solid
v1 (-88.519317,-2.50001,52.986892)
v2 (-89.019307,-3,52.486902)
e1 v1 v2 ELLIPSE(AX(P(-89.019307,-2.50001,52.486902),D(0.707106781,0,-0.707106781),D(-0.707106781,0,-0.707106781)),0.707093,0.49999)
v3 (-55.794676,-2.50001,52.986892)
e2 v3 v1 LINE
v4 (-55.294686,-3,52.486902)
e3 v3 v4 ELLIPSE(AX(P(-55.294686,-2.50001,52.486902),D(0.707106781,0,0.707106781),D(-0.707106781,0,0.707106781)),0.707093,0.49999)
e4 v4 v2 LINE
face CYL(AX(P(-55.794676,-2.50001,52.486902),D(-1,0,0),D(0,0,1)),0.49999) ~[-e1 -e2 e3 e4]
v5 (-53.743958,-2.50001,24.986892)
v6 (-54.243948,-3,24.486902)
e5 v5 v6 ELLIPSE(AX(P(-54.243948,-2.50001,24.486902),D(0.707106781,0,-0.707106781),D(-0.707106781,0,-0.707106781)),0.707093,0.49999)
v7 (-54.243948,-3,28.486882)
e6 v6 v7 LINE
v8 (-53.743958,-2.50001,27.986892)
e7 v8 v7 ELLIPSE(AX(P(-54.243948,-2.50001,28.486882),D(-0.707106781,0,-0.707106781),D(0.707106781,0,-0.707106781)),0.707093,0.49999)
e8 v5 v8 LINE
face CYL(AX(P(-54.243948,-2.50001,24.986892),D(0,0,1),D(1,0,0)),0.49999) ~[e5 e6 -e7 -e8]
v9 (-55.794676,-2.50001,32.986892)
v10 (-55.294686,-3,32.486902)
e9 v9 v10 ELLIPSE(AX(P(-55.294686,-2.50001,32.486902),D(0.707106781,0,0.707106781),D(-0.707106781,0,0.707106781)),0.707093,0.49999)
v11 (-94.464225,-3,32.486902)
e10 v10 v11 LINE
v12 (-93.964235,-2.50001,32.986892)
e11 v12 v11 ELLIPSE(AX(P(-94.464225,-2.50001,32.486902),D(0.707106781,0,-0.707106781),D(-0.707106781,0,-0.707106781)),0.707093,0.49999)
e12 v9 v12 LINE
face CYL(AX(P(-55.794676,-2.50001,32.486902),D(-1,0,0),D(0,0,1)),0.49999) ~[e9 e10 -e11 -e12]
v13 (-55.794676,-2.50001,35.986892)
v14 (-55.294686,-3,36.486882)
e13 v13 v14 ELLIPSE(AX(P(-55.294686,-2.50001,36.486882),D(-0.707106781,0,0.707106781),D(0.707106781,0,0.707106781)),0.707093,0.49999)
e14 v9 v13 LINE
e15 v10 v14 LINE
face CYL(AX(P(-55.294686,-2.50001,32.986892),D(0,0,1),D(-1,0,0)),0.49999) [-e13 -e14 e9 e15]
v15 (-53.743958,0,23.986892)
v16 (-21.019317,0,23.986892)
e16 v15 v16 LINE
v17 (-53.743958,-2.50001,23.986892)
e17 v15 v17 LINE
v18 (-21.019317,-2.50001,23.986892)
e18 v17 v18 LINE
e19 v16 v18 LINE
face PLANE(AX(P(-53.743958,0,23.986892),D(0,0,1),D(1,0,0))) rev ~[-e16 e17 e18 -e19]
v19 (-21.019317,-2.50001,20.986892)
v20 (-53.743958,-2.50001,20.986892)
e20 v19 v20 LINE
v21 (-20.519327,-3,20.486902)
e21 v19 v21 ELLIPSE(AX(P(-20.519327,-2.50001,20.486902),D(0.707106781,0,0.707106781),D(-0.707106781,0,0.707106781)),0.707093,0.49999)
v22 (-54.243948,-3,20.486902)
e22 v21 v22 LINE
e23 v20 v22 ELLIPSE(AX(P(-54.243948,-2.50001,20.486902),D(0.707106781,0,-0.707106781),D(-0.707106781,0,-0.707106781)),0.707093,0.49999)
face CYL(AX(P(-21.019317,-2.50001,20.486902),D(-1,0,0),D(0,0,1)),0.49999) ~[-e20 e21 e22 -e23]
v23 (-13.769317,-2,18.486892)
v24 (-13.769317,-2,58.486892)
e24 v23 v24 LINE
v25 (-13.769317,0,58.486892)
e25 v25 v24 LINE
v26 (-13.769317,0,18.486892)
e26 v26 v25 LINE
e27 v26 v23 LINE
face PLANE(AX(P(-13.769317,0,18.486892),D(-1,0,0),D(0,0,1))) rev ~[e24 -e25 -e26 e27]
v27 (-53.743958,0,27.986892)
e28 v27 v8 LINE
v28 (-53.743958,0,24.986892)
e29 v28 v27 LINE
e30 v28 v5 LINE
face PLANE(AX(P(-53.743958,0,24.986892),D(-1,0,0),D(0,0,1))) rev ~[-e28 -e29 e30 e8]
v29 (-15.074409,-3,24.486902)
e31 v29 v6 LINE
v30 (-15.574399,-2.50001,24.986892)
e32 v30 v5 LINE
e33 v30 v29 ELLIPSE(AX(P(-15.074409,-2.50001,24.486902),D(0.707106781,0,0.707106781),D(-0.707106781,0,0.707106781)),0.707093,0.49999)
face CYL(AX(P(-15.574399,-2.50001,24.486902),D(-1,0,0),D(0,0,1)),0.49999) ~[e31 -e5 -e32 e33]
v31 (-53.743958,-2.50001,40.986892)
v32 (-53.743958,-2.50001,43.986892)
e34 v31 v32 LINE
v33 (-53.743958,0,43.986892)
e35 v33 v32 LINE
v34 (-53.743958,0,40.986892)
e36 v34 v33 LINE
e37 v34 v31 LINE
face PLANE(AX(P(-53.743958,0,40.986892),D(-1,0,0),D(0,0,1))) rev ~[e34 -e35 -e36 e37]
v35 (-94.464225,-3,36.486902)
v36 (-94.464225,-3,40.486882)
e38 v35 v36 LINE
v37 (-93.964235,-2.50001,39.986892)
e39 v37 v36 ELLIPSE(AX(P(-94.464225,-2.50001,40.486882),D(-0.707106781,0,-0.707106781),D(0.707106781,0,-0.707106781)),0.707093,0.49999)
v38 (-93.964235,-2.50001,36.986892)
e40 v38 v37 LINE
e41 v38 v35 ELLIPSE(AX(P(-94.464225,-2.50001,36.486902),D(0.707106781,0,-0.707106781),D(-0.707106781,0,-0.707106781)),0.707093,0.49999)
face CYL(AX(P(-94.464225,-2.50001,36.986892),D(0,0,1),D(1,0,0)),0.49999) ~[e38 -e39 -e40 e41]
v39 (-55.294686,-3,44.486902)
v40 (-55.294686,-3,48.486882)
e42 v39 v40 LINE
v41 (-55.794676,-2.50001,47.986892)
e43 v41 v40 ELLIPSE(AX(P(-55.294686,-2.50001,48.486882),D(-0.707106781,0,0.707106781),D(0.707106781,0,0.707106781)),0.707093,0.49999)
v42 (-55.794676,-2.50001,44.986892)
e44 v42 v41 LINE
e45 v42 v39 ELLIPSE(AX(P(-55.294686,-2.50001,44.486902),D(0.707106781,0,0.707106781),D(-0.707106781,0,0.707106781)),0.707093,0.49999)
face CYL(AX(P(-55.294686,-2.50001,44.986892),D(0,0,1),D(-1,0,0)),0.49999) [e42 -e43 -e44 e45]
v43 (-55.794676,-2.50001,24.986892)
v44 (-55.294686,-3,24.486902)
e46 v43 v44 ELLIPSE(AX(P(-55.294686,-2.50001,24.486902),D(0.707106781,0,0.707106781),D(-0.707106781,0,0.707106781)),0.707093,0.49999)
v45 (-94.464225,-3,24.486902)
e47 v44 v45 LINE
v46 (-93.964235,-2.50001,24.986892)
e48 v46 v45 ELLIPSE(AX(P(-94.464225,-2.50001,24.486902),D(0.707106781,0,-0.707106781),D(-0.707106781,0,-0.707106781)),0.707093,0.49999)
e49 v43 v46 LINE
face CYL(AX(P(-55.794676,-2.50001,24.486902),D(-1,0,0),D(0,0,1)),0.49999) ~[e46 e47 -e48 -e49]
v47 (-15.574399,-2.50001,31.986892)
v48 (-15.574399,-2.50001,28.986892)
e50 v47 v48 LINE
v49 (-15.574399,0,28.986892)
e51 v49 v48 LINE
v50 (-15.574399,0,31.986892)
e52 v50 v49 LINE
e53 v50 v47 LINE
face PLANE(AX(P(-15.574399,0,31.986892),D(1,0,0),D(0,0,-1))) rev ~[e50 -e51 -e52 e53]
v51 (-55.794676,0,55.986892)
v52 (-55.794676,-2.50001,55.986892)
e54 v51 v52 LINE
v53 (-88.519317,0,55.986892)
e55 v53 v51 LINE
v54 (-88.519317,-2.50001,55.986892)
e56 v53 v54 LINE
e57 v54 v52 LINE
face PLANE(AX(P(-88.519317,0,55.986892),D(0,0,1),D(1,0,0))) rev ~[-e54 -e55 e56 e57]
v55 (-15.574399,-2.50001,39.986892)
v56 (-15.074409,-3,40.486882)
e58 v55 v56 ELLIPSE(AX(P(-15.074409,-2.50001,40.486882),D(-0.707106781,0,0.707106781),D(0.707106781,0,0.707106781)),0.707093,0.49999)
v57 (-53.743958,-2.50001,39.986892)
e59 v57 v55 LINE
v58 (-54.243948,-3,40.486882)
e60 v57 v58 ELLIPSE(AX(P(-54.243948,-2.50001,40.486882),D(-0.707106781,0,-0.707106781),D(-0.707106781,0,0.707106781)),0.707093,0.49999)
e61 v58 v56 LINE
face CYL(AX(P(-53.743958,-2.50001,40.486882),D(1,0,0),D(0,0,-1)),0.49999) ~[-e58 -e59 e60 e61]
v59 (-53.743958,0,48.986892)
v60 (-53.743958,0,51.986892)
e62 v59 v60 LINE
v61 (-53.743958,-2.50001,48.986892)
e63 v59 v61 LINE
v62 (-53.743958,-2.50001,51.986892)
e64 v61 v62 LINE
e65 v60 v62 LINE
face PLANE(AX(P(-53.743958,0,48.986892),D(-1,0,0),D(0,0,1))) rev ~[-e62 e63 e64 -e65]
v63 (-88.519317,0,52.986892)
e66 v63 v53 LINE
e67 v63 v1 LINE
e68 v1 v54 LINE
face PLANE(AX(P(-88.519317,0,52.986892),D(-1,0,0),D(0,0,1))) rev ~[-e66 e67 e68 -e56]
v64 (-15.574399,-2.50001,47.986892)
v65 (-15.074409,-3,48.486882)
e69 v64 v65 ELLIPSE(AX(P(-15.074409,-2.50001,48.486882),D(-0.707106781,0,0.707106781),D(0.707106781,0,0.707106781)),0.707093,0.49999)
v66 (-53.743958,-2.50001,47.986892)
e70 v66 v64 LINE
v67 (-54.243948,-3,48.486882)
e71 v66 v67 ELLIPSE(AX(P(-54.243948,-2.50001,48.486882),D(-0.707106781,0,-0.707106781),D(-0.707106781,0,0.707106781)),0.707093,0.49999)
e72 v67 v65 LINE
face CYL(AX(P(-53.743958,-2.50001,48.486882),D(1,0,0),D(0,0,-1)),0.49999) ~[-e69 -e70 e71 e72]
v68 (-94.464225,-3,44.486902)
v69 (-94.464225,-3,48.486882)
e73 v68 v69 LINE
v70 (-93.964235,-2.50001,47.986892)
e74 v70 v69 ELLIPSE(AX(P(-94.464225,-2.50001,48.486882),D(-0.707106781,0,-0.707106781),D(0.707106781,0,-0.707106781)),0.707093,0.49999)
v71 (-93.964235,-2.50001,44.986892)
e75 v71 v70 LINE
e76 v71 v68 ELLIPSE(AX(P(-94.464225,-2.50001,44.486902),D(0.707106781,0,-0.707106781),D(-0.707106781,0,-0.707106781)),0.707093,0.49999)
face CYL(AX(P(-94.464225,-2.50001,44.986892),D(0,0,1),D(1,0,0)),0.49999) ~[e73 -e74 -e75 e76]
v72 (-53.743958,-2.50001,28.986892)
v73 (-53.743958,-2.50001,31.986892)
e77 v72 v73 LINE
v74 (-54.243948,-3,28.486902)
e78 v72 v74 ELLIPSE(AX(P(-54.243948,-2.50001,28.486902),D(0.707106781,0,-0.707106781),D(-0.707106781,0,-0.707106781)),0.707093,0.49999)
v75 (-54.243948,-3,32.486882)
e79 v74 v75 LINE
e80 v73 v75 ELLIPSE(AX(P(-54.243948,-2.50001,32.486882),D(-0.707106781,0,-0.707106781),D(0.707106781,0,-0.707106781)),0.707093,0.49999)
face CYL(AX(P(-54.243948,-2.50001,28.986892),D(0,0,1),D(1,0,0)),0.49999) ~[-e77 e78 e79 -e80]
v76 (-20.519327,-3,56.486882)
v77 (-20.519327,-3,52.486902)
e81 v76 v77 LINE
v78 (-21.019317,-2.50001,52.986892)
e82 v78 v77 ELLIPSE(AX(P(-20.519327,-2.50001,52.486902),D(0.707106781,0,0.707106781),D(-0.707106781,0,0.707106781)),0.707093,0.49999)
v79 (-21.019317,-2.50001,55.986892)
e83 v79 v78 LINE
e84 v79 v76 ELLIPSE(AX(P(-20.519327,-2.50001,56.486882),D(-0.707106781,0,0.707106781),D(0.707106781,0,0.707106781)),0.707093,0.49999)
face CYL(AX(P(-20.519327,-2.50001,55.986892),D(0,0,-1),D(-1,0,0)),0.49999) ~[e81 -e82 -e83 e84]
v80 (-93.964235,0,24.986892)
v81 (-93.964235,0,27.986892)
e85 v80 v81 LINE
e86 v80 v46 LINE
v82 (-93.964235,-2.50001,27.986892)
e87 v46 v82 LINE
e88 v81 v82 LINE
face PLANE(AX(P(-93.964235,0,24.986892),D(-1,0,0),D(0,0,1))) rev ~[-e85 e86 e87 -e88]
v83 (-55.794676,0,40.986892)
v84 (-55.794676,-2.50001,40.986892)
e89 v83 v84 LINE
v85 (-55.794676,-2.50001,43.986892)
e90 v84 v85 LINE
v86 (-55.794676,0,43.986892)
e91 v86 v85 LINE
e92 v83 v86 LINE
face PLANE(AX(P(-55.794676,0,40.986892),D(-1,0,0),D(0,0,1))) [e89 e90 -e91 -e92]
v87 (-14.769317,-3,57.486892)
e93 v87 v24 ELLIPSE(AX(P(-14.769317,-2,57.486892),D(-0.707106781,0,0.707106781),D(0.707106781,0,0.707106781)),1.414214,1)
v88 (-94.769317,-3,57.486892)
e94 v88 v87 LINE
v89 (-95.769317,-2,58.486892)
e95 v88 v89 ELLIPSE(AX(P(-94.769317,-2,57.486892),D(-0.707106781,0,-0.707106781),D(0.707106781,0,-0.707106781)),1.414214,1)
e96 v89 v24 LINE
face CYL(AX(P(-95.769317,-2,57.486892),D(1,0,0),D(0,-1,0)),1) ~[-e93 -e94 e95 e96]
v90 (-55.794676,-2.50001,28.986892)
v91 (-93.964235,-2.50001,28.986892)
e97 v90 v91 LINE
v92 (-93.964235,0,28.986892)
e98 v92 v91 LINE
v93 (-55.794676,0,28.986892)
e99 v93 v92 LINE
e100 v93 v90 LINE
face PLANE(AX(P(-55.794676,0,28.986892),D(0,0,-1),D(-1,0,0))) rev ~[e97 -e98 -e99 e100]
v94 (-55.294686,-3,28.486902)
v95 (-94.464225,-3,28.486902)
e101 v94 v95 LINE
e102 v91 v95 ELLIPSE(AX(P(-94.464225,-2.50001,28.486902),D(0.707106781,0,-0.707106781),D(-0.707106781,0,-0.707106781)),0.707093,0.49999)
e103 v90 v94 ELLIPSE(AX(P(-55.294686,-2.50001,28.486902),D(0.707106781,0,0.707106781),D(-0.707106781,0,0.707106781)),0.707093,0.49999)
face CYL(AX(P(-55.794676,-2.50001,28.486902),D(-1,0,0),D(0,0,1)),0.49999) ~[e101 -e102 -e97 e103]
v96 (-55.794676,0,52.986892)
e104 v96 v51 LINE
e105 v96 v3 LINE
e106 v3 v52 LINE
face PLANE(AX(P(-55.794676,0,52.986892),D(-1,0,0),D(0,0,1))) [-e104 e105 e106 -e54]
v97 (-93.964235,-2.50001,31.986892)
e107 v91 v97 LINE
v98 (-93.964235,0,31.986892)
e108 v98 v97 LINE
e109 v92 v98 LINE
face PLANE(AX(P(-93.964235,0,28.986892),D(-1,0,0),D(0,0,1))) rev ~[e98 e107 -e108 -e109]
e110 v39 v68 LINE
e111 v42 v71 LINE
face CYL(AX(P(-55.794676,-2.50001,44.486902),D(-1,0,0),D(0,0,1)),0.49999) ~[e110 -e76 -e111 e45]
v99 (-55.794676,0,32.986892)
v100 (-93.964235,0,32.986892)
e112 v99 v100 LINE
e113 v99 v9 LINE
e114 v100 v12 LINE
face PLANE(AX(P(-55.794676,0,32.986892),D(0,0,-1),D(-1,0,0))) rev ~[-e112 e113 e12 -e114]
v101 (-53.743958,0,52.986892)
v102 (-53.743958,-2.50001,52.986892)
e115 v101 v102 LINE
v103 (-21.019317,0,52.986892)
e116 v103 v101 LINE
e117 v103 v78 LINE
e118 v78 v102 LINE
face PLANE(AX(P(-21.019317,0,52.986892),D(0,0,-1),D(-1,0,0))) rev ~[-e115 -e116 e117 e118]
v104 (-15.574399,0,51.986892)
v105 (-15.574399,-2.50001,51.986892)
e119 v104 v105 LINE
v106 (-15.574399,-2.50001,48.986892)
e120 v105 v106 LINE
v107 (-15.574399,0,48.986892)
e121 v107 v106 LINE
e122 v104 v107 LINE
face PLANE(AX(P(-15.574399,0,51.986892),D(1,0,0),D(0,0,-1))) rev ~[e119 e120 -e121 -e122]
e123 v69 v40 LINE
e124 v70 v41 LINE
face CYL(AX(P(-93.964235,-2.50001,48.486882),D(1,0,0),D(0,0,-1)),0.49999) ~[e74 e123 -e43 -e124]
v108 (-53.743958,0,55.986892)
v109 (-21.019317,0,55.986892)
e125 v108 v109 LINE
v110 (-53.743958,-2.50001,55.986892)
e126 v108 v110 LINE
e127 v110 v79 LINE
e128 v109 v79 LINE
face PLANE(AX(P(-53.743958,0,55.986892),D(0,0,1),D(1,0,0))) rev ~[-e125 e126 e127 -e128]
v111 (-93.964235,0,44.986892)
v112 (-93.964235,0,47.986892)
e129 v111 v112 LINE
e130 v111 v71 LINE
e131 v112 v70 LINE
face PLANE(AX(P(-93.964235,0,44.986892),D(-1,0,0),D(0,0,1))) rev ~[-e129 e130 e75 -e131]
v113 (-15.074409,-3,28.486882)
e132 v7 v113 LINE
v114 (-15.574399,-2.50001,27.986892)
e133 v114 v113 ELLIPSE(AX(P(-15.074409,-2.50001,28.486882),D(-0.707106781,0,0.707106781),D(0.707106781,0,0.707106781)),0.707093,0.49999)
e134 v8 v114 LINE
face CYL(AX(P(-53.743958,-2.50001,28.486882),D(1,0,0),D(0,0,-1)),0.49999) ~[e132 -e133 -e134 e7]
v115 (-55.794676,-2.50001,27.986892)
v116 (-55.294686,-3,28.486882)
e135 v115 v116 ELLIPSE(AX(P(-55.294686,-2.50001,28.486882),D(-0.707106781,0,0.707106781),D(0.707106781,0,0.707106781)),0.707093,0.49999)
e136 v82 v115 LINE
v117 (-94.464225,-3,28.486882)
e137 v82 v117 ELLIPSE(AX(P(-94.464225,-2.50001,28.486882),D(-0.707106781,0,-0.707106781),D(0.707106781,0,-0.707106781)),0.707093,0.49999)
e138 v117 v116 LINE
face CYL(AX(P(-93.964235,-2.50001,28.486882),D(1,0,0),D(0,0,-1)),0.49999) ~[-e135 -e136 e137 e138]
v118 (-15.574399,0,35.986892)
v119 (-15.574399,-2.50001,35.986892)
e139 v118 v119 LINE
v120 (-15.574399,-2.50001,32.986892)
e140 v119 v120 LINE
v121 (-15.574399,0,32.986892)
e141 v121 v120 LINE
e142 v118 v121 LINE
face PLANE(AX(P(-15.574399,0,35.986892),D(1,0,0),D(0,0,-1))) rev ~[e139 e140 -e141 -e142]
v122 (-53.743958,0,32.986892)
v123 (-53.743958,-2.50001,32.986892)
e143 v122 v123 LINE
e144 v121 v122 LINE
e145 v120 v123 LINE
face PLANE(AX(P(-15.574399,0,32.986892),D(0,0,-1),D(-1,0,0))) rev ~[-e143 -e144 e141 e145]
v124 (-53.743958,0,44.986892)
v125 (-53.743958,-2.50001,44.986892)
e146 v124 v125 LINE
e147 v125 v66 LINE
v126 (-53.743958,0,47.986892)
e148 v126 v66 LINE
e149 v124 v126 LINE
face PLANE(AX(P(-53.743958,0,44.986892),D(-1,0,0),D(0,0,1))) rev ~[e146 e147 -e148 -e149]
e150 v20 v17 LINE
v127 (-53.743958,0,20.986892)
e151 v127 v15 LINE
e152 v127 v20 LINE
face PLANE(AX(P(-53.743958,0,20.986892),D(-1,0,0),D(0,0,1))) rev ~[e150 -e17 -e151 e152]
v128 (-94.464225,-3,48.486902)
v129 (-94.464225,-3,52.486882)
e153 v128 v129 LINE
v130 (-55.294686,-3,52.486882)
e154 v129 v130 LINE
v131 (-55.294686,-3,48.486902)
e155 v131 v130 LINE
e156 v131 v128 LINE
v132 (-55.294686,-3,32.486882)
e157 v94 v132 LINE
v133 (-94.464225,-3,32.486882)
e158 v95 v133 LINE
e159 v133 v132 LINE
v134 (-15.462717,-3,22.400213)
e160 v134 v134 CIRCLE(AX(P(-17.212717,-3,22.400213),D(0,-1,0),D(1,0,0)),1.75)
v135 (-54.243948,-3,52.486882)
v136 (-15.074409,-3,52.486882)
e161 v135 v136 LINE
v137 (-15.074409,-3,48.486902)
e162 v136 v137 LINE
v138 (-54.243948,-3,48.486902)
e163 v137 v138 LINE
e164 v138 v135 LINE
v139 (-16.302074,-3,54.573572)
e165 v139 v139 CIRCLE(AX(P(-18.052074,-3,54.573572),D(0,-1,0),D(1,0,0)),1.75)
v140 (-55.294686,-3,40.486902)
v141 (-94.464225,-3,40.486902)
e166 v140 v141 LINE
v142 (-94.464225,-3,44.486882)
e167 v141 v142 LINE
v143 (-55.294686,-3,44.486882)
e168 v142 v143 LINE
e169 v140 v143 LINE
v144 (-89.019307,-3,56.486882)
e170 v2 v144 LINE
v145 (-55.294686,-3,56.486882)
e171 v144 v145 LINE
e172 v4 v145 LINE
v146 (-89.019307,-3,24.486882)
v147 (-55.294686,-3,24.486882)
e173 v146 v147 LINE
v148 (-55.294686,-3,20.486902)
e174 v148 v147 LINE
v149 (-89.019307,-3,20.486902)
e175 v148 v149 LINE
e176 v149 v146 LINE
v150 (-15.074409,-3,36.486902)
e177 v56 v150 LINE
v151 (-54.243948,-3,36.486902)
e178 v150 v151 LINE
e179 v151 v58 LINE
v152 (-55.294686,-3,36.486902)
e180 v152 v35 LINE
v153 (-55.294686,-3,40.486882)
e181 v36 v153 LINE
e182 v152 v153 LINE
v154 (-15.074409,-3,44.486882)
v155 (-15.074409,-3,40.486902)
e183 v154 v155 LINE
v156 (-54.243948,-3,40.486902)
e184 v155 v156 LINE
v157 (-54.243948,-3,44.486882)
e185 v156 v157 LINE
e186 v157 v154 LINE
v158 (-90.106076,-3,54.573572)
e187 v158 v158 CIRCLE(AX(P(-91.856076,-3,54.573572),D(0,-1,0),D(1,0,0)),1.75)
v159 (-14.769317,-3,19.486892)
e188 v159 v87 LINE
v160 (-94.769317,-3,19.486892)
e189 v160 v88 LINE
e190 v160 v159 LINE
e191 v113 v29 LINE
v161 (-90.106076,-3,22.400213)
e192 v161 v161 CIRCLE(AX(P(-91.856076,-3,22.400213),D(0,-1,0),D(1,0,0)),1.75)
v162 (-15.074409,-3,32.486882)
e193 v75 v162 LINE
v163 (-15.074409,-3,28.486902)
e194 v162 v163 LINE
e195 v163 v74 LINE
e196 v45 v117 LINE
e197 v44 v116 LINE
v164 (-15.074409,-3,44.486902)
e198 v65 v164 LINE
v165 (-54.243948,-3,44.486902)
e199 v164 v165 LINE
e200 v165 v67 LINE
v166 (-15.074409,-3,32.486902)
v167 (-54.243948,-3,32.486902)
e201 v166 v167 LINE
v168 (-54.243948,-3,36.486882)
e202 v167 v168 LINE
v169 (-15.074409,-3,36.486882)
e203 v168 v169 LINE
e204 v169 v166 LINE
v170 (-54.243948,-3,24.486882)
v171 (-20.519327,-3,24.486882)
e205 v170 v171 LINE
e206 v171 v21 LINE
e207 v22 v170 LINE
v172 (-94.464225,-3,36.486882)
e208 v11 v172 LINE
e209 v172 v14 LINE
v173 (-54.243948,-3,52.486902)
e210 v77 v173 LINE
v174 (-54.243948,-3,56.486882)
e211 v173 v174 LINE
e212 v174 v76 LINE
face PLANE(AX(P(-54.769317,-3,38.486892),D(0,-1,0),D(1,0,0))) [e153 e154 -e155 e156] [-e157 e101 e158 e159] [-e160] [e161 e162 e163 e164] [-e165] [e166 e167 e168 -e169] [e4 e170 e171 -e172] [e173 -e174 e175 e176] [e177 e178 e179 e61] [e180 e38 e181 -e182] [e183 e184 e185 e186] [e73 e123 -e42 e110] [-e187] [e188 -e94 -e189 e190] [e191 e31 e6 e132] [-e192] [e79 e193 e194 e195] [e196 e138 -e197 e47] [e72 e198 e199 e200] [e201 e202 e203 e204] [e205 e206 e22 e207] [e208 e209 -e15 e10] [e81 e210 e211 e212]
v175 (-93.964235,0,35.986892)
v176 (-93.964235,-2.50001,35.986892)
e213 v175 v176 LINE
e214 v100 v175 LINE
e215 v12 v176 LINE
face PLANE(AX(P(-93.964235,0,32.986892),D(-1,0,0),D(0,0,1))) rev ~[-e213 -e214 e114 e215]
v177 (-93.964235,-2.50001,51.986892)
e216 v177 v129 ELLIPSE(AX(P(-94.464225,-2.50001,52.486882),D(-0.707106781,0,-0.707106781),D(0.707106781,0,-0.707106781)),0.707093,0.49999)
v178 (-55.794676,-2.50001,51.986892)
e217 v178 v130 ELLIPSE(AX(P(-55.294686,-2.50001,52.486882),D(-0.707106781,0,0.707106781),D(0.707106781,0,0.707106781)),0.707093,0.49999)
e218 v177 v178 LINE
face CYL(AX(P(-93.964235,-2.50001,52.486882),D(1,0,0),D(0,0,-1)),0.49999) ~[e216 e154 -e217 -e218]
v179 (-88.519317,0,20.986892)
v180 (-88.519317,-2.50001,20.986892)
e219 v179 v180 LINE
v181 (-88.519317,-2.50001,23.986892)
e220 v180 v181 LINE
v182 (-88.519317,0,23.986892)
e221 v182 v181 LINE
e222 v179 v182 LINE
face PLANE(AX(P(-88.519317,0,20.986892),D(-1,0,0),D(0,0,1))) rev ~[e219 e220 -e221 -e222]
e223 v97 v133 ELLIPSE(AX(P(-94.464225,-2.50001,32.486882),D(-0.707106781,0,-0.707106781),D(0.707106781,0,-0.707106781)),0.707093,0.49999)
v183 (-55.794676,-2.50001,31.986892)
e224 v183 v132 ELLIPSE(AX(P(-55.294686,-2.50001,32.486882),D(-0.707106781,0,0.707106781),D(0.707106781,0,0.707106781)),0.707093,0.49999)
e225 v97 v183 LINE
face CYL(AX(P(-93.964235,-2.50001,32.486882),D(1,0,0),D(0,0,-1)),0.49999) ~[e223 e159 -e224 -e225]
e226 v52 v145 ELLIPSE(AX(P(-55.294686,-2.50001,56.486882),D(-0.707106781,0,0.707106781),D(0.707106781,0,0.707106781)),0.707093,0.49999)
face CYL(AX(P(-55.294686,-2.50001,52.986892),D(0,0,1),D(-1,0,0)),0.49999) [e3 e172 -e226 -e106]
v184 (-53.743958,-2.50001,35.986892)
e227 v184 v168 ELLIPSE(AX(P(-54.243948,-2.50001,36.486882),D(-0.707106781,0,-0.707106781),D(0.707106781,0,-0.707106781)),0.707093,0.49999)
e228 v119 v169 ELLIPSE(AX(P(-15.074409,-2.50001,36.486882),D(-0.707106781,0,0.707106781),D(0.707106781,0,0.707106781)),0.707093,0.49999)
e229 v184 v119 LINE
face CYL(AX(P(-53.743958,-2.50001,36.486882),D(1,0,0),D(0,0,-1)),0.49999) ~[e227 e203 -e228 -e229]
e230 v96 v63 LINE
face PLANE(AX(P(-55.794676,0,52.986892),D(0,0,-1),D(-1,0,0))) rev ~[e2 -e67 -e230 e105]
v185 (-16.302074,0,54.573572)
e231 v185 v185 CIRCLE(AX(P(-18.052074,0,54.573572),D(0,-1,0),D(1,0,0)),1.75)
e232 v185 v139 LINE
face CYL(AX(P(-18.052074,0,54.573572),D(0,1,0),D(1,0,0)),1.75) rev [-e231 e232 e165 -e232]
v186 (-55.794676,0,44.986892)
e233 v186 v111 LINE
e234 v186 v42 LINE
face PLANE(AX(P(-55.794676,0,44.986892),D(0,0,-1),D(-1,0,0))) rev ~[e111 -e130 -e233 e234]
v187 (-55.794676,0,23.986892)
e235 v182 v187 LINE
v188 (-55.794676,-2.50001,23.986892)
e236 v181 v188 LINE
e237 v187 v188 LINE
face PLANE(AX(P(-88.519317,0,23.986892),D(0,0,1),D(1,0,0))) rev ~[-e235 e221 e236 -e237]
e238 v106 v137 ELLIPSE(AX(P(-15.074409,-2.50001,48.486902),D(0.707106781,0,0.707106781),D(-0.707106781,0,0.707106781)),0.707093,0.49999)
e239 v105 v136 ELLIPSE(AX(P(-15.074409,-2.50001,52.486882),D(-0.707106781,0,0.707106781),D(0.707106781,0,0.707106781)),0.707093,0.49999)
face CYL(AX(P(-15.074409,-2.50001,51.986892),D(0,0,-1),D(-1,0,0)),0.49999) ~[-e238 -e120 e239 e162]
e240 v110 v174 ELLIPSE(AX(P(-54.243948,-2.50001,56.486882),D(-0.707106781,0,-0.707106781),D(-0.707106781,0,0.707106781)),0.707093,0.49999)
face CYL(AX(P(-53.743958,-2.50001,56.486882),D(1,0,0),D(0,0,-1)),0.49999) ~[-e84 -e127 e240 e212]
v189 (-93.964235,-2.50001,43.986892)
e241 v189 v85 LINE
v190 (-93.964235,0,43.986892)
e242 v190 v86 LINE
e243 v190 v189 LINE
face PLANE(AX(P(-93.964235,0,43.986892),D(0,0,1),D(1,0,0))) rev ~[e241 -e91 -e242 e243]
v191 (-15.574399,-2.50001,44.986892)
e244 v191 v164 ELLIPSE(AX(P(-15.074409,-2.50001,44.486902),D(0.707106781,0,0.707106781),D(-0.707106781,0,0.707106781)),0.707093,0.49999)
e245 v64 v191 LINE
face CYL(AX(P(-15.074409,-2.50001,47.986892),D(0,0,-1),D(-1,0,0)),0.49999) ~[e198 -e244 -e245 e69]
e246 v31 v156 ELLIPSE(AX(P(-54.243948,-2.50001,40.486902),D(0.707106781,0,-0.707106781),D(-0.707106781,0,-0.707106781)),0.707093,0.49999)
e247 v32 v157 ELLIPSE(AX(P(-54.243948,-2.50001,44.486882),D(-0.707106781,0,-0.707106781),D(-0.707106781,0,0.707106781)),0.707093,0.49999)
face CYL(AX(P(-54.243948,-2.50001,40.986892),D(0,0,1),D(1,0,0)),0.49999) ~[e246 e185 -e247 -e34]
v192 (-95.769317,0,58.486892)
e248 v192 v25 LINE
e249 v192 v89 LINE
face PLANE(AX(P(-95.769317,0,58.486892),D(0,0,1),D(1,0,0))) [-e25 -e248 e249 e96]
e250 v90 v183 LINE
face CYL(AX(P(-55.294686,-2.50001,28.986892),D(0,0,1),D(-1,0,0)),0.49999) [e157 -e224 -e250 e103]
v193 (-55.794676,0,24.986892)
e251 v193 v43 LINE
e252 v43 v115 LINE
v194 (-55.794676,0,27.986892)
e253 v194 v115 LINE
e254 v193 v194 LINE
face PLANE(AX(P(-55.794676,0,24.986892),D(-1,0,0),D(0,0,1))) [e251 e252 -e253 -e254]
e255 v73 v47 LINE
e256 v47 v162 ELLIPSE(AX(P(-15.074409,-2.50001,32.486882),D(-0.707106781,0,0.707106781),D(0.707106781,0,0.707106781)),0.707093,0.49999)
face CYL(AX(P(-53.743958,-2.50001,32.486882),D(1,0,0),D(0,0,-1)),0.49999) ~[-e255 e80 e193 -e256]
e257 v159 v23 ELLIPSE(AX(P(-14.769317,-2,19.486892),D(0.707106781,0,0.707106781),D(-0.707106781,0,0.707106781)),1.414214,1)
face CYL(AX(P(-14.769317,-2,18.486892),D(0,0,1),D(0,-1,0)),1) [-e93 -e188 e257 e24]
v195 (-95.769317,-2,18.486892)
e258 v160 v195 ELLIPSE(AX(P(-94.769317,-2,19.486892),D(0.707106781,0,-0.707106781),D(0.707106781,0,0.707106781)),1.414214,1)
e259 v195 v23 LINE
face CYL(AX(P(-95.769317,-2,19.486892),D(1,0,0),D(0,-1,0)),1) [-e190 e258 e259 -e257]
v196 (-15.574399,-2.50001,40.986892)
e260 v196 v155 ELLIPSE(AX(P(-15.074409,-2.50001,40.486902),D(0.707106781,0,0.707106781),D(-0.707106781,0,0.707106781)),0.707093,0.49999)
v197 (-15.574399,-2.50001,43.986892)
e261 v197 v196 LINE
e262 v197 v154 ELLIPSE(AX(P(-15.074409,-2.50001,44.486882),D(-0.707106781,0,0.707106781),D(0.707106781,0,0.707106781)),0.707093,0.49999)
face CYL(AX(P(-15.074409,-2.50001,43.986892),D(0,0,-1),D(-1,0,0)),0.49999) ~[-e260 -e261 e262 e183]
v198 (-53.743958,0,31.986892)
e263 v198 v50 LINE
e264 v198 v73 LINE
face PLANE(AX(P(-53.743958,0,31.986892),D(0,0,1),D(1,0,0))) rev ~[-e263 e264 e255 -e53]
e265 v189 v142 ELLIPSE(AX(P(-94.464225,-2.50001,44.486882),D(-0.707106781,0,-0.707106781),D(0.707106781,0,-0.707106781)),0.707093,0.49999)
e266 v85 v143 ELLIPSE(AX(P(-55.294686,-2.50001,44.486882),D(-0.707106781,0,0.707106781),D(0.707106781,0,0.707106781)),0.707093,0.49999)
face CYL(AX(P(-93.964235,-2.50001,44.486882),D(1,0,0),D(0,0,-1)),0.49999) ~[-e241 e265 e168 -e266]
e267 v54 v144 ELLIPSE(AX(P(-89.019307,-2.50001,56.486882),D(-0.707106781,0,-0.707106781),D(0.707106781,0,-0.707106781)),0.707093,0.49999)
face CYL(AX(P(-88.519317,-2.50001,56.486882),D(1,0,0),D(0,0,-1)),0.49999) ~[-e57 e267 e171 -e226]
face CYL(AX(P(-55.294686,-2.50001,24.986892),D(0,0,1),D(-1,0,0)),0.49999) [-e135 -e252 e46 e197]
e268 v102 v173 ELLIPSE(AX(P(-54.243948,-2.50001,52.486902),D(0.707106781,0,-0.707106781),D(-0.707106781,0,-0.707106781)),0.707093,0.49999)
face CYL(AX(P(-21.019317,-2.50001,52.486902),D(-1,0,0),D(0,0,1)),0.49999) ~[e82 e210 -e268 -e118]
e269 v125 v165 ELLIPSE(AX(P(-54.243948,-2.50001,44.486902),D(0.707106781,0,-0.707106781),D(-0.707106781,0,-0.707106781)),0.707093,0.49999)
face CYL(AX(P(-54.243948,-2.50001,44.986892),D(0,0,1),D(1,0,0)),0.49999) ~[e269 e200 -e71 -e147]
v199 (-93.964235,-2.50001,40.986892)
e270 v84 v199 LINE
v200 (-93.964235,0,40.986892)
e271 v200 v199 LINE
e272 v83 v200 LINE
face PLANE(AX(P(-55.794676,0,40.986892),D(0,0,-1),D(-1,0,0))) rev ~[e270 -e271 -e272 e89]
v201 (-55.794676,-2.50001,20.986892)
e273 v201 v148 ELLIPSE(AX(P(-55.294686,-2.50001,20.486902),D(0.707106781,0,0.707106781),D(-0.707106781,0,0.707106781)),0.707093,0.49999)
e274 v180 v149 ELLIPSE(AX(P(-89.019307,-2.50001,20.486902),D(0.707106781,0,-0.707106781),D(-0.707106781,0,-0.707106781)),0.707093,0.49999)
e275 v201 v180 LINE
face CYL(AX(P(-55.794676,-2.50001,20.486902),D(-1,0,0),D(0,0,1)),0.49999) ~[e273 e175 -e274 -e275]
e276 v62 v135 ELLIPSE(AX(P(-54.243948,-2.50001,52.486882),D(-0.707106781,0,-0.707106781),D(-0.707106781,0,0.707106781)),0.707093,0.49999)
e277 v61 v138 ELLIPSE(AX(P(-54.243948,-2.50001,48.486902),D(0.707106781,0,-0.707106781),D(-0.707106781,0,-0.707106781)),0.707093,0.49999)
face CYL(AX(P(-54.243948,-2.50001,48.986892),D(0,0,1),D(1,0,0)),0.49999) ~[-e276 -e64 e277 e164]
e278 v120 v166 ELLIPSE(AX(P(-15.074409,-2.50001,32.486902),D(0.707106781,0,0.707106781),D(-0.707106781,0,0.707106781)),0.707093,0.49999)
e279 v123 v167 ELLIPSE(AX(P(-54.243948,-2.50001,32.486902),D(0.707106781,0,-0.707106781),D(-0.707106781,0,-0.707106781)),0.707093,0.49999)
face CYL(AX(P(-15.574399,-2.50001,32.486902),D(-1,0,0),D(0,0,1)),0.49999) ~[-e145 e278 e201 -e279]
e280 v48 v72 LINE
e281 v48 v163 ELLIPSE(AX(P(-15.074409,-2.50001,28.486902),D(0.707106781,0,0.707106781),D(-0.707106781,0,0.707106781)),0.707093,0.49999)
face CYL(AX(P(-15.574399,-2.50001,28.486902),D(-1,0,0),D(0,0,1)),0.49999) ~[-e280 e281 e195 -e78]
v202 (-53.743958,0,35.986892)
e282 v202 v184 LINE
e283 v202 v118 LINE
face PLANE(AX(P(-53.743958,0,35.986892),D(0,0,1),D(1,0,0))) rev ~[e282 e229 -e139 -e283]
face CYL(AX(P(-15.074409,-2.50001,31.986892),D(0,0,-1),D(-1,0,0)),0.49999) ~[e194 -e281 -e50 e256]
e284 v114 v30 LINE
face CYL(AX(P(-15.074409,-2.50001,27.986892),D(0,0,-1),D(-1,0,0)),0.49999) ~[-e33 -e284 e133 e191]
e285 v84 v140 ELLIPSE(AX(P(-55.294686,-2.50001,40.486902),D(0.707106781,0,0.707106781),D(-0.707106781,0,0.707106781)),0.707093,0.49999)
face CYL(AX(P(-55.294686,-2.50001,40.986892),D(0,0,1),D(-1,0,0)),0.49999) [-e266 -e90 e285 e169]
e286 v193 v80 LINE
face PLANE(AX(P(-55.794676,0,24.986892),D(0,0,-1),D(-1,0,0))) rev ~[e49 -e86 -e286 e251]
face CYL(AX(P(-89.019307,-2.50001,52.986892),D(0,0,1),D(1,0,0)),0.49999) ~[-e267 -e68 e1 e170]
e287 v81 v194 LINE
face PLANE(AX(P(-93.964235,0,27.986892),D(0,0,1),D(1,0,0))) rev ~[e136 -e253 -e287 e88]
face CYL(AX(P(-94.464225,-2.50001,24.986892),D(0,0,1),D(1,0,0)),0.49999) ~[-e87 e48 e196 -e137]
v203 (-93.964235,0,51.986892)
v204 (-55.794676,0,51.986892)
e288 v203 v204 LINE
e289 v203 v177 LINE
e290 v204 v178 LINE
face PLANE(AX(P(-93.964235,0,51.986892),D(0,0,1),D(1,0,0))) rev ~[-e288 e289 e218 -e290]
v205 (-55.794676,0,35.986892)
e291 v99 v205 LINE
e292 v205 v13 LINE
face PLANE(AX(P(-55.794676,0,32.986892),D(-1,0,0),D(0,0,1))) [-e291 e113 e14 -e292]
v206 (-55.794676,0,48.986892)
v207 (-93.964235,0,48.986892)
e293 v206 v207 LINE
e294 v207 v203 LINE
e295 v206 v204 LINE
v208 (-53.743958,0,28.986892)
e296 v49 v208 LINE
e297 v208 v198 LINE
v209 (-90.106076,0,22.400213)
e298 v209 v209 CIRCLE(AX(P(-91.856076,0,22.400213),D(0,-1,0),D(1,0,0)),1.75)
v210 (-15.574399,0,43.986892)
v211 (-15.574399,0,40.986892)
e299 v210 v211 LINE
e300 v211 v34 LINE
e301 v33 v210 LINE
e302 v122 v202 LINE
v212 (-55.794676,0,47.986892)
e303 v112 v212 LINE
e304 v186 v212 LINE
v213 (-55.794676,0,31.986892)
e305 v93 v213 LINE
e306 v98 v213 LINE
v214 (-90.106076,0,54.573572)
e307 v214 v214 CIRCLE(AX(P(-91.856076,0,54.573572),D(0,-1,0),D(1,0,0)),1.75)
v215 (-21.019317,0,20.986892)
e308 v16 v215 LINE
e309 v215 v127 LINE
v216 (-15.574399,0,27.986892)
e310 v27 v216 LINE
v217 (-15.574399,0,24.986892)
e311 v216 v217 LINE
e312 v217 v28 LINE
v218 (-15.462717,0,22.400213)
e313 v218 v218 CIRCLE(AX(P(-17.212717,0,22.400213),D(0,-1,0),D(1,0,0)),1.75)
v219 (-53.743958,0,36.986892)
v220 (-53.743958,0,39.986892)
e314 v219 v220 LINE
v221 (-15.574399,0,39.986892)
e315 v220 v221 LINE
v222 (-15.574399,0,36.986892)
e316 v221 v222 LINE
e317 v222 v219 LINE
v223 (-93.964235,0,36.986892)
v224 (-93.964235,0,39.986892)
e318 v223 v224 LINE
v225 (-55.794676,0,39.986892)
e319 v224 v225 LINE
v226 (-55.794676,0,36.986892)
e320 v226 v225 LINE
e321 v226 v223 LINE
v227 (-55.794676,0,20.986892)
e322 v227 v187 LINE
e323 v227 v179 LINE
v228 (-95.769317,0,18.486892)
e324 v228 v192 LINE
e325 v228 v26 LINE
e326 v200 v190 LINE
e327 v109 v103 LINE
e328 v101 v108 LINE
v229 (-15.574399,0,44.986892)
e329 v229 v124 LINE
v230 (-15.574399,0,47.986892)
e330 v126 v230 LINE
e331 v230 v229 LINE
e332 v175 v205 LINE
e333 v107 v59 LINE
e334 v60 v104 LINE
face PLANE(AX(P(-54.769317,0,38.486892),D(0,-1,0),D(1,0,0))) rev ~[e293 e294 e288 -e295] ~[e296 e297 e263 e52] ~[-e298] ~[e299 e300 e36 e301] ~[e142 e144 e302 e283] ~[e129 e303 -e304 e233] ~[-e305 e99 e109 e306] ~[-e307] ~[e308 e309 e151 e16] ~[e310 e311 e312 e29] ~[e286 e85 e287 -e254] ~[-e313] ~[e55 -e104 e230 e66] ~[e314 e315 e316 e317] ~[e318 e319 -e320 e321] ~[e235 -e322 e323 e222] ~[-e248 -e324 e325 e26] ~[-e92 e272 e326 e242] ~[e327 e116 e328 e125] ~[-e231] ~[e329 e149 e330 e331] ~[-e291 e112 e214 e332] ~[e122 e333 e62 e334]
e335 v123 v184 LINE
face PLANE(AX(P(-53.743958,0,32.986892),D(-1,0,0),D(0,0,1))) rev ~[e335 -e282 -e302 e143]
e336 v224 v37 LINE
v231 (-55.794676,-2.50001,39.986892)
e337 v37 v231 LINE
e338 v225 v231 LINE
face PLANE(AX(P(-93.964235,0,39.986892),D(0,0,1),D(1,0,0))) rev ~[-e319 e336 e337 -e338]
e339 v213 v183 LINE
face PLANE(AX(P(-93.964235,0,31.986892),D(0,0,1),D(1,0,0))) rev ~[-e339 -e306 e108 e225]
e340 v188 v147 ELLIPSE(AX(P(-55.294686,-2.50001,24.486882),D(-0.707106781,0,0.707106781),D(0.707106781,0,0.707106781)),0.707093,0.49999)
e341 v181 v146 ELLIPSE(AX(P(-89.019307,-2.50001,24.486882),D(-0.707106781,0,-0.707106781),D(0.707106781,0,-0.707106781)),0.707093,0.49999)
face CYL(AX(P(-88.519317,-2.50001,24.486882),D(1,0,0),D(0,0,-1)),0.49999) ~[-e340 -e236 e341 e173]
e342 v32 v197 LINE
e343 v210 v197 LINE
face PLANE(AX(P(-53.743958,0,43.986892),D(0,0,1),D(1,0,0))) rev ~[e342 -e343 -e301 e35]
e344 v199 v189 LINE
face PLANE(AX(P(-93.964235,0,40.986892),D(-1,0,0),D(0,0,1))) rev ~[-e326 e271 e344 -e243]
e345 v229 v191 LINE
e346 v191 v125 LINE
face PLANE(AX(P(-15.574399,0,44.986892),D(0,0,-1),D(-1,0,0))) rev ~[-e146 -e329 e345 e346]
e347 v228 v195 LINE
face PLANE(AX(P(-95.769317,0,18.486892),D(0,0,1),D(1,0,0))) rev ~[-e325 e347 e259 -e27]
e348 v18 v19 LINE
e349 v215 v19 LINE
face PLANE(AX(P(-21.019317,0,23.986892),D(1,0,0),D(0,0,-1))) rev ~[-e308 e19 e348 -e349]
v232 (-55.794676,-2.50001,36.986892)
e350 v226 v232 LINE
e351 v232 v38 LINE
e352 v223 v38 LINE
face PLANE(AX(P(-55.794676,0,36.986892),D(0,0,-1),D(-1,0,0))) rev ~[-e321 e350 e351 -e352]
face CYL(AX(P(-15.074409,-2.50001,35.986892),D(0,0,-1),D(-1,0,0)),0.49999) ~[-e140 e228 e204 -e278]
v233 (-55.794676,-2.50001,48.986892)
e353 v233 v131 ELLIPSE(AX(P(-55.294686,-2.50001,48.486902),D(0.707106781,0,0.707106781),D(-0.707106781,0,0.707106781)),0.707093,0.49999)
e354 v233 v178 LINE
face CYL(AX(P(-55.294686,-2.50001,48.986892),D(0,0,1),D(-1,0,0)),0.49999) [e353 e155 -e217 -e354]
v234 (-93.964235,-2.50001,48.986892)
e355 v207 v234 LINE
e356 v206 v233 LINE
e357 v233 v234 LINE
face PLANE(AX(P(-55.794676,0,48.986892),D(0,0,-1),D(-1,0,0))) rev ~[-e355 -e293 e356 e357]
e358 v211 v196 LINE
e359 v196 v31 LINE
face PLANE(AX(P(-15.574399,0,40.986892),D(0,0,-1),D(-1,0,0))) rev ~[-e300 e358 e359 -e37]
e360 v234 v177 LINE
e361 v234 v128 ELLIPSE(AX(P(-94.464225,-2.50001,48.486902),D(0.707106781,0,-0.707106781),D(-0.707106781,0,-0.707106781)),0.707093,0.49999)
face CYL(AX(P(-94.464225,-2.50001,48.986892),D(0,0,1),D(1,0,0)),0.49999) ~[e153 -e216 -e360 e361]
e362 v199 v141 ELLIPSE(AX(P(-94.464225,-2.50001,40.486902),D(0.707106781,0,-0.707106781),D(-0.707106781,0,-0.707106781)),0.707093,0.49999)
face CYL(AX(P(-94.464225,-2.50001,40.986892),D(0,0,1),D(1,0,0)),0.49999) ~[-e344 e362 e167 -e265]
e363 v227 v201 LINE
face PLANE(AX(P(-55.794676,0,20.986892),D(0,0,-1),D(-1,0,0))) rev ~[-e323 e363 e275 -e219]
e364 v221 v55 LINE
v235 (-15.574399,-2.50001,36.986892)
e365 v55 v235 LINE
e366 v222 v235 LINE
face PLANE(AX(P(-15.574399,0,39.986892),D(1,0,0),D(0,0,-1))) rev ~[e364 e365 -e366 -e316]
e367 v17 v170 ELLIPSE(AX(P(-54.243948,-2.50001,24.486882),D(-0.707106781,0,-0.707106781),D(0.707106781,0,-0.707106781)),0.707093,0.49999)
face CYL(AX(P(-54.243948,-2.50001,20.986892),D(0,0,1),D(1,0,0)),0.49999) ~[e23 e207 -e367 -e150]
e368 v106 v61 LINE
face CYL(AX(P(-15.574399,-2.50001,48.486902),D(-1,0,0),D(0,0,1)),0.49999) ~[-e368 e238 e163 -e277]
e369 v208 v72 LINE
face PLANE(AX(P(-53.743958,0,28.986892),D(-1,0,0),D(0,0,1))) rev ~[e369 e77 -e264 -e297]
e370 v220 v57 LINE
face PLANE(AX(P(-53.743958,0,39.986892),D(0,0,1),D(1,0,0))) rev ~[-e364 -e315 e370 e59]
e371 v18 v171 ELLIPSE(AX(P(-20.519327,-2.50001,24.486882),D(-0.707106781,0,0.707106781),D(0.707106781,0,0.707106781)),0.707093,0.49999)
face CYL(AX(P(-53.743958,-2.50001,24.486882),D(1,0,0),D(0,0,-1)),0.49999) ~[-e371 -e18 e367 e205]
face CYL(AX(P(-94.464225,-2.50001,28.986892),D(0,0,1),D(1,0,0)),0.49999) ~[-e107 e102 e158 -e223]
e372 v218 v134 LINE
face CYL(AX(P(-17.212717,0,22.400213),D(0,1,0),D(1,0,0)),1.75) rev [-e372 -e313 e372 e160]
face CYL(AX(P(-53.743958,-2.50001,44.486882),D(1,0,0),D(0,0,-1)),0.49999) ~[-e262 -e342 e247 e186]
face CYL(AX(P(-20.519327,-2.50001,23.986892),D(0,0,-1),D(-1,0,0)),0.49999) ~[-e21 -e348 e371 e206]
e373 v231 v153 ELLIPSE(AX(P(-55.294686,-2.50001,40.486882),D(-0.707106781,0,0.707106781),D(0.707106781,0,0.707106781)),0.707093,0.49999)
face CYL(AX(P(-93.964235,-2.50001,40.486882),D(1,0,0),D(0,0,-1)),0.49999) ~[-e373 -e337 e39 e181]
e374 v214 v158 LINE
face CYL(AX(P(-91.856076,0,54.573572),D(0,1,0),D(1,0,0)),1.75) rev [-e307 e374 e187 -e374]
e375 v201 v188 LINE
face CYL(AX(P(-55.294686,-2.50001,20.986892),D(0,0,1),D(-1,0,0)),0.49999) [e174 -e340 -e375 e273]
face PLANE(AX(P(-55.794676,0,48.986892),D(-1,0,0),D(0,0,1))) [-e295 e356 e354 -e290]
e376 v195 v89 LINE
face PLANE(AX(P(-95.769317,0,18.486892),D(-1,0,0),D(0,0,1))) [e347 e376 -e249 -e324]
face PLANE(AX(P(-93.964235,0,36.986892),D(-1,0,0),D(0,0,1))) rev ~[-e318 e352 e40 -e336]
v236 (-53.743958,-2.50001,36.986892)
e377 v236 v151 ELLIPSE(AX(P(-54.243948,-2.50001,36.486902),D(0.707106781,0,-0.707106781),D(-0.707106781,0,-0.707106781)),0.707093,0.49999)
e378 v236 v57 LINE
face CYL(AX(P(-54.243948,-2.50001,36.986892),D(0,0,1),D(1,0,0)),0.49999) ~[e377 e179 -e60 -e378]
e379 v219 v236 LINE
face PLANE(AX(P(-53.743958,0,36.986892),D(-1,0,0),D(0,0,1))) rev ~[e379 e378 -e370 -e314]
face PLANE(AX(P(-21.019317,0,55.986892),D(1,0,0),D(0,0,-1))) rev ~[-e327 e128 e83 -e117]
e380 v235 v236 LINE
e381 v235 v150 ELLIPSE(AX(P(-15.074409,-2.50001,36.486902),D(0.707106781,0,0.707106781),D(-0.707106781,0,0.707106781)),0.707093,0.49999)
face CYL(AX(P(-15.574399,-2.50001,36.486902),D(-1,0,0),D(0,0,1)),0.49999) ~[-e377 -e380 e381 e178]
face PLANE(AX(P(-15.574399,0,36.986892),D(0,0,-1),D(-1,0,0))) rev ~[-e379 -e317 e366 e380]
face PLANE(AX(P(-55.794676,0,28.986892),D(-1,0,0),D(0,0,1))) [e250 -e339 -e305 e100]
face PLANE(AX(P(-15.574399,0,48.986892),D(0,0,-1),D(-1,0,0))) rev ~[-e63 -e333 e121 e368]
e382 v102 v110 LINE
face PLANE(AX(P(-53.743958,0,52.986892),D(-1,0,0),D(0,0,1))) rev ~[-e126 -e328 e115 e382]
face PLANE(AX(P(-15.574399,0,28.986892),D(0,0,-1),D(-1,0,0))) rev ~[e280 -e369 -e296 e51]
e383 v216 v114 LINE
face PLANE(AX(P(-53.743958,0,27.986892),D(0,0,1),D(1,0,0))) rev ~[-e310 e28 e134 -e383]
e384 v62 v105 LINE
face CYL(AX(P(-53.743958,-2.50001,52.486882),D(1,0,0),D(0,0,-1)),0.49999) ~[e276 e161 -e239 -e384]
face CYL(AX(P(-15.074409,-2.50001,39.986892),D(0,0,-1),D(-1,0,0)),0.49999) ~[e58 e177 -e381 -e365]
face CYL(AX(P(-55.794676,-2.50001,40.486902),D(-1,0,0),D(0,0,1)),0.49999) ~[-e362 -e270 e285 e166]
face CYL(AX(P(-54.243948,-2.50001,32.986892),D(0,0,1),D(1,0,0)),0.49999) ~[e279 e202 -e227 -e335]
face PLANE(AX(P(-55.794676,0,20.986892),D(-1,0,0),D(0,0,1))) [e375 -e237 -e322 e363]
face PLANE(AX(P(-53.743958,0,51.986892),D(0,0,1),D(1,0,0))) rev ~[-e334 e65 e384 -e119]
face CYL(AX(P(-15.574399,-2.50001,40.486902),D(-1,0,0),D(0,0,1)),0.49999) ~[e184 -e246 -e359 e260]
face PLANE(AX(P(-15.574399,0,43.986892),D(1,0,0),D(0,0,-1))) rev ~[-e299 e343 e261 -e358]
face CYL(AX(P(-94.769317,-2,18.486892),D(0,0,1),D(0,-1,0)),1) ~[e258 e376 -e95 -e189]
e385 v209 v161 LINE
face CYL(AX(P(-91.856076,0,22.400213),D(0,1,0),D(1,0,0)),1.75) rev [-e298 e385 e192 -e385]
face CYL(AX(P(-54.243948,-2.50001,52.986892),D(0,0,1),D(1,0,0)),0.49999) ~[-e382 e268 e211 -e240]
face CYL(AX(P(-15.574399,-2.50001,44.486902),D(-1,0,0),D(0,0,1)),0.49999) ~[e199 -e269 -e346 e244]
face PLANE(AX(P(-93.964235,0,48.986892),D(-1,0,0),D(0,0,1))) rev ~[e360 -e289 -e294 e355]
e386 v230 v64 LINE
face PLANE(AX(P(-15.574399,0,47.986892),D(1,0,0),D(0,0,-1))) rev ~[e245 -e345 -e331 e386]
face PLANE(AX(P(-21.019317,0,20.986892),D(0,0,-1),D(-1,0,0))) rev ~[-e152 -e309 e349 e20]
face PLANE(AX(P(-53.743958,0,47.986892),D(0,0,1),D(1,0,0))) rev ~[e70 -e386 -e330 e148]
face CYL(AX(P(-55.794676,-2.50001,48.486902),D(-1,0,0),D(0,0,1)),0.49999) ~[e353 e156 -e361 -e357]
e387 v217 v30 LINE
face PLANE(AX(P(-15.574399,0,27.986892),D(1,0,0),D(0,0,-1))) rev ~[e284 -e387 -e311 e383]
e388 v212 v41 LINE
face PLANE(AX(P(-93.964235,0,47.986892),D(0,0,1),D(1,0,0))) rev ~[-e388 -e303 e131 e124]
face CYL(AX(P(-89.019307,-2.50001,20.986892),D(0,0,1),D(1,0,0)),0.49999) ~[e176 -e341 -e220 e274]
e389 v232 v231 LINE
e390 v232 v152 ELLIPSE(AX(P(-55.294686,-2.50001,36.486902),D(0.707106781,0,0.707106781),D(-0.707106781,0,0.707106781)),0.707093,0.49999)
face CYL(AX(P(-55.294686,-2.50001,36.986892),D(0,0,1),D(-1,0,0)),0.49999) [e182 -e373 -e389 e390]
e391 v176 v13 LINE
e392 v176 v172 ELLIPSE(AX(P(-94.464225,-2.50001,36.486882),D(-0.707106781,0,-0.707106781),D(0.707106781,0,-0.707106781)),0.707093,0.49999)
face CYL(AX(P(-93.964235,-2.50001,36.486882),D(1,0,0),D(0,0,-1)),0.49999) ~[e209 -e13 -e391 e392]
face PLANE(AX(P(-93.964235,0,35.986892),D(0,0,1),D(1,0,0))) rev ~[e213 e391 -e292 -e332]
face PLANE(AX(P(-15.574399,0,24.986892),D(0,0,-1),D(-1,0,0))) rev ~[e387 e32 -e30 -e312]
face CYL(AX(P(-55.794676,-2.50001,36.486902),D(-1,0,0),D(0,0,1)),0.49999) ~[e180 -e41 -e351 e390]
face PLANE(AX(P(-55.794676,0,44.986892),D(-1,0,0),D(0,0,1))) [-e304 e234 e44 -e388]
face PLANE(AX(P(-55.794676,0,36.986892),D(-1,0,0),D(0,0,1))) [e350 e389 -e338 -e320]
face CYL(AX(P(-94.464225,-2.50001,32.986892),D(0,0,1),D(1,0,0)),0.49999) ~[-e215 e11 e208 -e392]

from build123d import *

# Parameters (mm, degrees)
F0_W     = 82
F0_H     = 40
F0_R     = 1.75
F0_W_2   = 2.0507176579
F0_H_2   = 3
F0_H_3   = 1
F1_DEPTH = 3
F2_R     = 0.49999
F3_R     = 1


# Not quite as in the source:
# - a fillet or chamfer is up to 0.001 mm smaller than in the source, because OpenCascade refuses the exact size


with BuildPart() as f1:
    # F0 (on Front) → F1 (new body)
    with BuildSketch(Plane.XZ):
        with Locations((-54.7693173022, 38.4868923018)):
            Rectangle(F0_W, F0_H)
        with Locations((-91.8560757875, 22.4002130298)):
            Circle(F0_R, mode=Mode.SUBTRACT)
        with Locations((-17.2127172435, 22.4002130298)):
            Circle(F0_R, mode=Mode.SUBTRACT)
        with Locations((-91.8560757875, 54.5735715738)):
            Circle(F0_R, mode=Mode.SUBTRACT)
        Polygon((-53.7439584732, 39.9868923018), (-15.5743994219, 39.9868923018), (-15.5743994219, 36.9868923018), (-53.7439584732, 36.9868923018), (-53.7439584732, 35.9868923018), (-15.5743994219, 35.9868923018), (-15.5743994219, 32.9868923018), (-53.7439584732, 32.9868923018), (-53.7439584732, 31.9868923018), (-15.5743994219, 31.9868923018), (-15.5743994219, 28.9868923018), (-53.7439584732, 28.9868923018), (-53.7439584732, 27.9868923018), (-15.5743994219, 27.9868923018), (-15.5743994219, 24.9868923018), (-53.7439584732, 24.9868923018), (-53.7439584732, 23.9868923018), (-21.0193173022, 23.9868923018), (-21.0193173022, 20.9868923018), (-53.7439584732, 20.9868923018), (-55.7946761312, 20.9868923018), (-88.5193173022, 20.9868923018), (-88.5193173022, 23.9868923018), (-55.7946761312, 23.9868923018), (-55.7946761312, 24.9868923018), (-93.9642351825, 24.9868923018), (-93.9642351825, 27.9868923018), (-55.7946761312, 27.9868923018), (-55.7946761312, 28.9868923018), (-93.9642351825, 28.9868923018), (-93.9642351825, 31.9868923018), (-55.7946761312, 31.9868923018), (-55.7946761312, 32.9868923018), (-93.9642351825, 32.9868923018), (-93.9642351825, 35.9868923018), (-55.7946761312, 35.9868923018), (-55.7946761312, 36.9868923018), (-93.9642351825, 36.9868923018), (-93.9642351825, 39.9868923018), (-55.7946761312, 39.9868923018), (-55.7946761312, 40.9868923018), (-93.9642351825, 40.9868923018), (-93.9642351825, 43.9868923018), (-55.7946761312, 43.9868923018), (-55.7946761312, 44.9868923018), (-93.9642351825, 44.9868923018), (-93.9642351825, 47.9868923018), (-55.7946761312, 47.9868923018), (-55.7946761312, 48.9868923018), (-93.9642351825, 48.9868923018), (-93.9642351825, 51.9868923018), (-55.7946761312, 51.9868923018), (-55.7946761312, 52.9868923018), (-88.5193173022, 52.9868923018), (-88.5193173022, 55.9868923018), (-55.7946761312, 55.9868923018), (-53.7439584732, 55.9868923018), (-21.0193173022, 55.9868923018), (-21.0193173022, 52.9868923018), (-53.7439584732, 52.9868923018), (-53.7439584732, 51.9868923018), (-15.5743994219, 51.9868923018), (-15.5743994219, 48.9868923018), (-53.7439584732, 48.9868923018), (-53.7439584732, 47.9868923018), (-15.5743994219, 47.9868923018), (-15.5743994219, 44.9868923018), (-53.7439584732, 44.9868923018), (-53.7439584732, 43.9868923018), (-15.5743994219, 43.9868923018), (-15.5743994219, 40.9868923018), (-53.7439584732, 40.9868923018), align=None, mode=Mode.SUBTRACT)
        with Locations((-18.0520743152, 54.5735715738)):
            Circle(F0_R, mode=Mode.SUBTRACT)
        with Locations((-54.7693173022, 54.4868923018)):
            Rectangle(F0_W_2, F0_H_2)
        with Locations((-54.7693173022, 52.4868923018)):
            Rectangle(F0_W_2, F0_H_3)
        with Locations((-54.7693173022, 50.4868923018)):
            Rectangle(F0_W_2, F0_H_2)
        with Locations((-54.7693173022, 48.4868923018)):
            Rectangle(F0_W_2, F0_H_3)
        with Locations((-54.7693173022, 46.4868923018)):
            Rectangle(F0_W_2, F0_H_2)
        with Locations((-54.7693173022, 44.4868923018)):
            Rectangle(F0_W_2, F0_H_3)
        with Locations((-54.7693173022, 42.4868923018)):
            Rectangle(F0_W_2, F0_H_2)
        with Locations((-54.7693173022, 40.4868923018)):
            Rectangle(F0_W_2, F0_H_3)
        with Locations((-54.7693173022, 38.4868923018)):
            Rectangle(F0_W_2, F0_H_2)
        with Locations((-54.7693173022, 36.4868923018)):
            Rectangle(F0_W_2, F0_H_3)
        with Locations((-54.7693173022, 34.4868923018)):
            Rectangle(F0_W_2, F0_H_2)
        with Locations((-54.7693173022, 32.4868923018)):
            Rectangle(F0_W_2, F0_H_3)
        with Locations((-54.7693173022, 30.4868923018)):
            Rectangle(F0_W_2, F0_H_2)
        with Locations((-54.7693173022, 28.4868923018)):
            Rectangle(F0_W_2, F0_H_3)
        with Locations((-54.7693173022, 26.4868923018)):
            Rectangle(F0_W_2, F0_H_2)
        with Locations((-54.7693173022, 24.4868923018)):
            Rectangle(F0_W_2, F0_H_3)
        with Locations((-54.7693173022, 22.4868923018)):
            Rectangle(F0_W_2, F0_H_2)
    extrude(amount=F1_DEPTH)

    # F2 (radius 0.5 in the source; OpenCascade refuses exactly that, so slightly less here)
    f2_edges = [f1.edges().sort_by_distance(p)[0] for p in [
        (-72.156997, -3, 20.986892),
        (-72.156997, -3, 23.986892),
        (-74.879456, -3, 24.986892),
        (-74.879456, -3, 27.986892),
        (-74.879456, -3, 28.986892),
        (-74.879456, -3, 31.986892),
        (-74.879456, -3, 32.986892),
        (-74.879456, -3, 35.986892),
        (-74.879456, -3, 36.986892),
        (-37.381638, -3, 20.986892),
        (-37.381638, -3, 23.986892),
        (-34.659179, -3, 24.986892),
        (-34.659179, -3, 27.986892),
        (-34.659179, -3, 28.986892),
        (-34.659179, -3, 31.986892),
        (-34.659179, -3, 32.986892),
        (-34.659179, -3, 35.986892),
        (-34.659179, -3, 36.986892),
        (-74.879456, -3, 39.986892),
        (-74.879456, -3, 40.986892),
        (-74.879456, -3, 43.986892),
        (-74.879456, -3, 44.986892),
        (-74.879456, -3, 47.986892),
        (-74.879456, -3, 48.986892),
        (-74.879456, -3, 51.986892),
        (-72.156997, -3, 52.986892),
        (-93.964235, -3, 26.486892),
        (-93.964235, -3, 30.486892),
        (-93.964235, -3, 34.486892),
        (-88.519317, -3, 22.486892),
        (-55.794676, -3, 22.486892),
        (-55.794676, -3, 26.486892),
        (-55.794676, -3, 30.486892),
        (-55.794676, -3, 34.486892),
        (-55.794676, -3, 38.486892),
        (-55.794676, -3, 42.486892),
        (-55.794676, -3, 46.486892),
        (-55.794676, -3, 50.486892),
        (-55.794676, -3, 54.486892),
        (-72.156997, -3, 55.986892),
        (-53.743958, -3, 22.486892),
        (-53.743958, -3, 26.486892),
        (-53.743958, -3, 30.486892),
        (-53.743958, -3, 34.486892),
        (-53.743958, -3, 38.486892),
        (-34.659179, -3, 39.986892),
        (-34.659179, -3, 40.986892),
        (-53.743958, -3, 42.486892),
        (-34.659179, -3, 43.986892),
        (-34.659179, -3, 44.986892),
        (-53.743958, -3, 46.486892),
        (-34.659179, -3, 48.986892),
        (-34.659179, -3, 47.986892),
        (-53.743958, -3, 50.486892),
        (-34.659179, -3, 51.986892),
        (-37.381638, -3, 52.986892),
        (-53.743958, -3, 54.486892),
        (-37.381638, -3, 55.986892),
        (-93.964235, -3, 38.486892),
        (-93.964235, -3, 42.486892),
        (-93.964235, -3, 46.486892),
        (-93.964235, -3, 50.486892),
        (-88.519317, -3, 54.486892),
        (-21.019317, -3, 22.486892),
        (-15.574399, -3, 26.486892),
        (-15.574399, -3, 30.486892),
        (-15.574399, -3, 34.486892),
        (-15.574399, -3, 38.486892),
        (-15.574399, -3, 42.486892),
        (-15.574399, -3, 46.486892),
        (-15.574399, -3, 50.486892),
        (-21.019317, -3, 54.486892),
    ]]
    fillet(f2_edges, radius=F2_R)

    # F3
    f3_edges = [f1.edges().sort_by_distance(p)[0] for p in [
        (-54.769317, -3, 58.486892),
        (-13.769317, -3, 38.486892),
        (-54.769317, -3, 18.486892),
        (-95.769317, -3, 38.486892),
    ]]
    fillet(f3_edges, radius=F3_R)


solid = f1.part
